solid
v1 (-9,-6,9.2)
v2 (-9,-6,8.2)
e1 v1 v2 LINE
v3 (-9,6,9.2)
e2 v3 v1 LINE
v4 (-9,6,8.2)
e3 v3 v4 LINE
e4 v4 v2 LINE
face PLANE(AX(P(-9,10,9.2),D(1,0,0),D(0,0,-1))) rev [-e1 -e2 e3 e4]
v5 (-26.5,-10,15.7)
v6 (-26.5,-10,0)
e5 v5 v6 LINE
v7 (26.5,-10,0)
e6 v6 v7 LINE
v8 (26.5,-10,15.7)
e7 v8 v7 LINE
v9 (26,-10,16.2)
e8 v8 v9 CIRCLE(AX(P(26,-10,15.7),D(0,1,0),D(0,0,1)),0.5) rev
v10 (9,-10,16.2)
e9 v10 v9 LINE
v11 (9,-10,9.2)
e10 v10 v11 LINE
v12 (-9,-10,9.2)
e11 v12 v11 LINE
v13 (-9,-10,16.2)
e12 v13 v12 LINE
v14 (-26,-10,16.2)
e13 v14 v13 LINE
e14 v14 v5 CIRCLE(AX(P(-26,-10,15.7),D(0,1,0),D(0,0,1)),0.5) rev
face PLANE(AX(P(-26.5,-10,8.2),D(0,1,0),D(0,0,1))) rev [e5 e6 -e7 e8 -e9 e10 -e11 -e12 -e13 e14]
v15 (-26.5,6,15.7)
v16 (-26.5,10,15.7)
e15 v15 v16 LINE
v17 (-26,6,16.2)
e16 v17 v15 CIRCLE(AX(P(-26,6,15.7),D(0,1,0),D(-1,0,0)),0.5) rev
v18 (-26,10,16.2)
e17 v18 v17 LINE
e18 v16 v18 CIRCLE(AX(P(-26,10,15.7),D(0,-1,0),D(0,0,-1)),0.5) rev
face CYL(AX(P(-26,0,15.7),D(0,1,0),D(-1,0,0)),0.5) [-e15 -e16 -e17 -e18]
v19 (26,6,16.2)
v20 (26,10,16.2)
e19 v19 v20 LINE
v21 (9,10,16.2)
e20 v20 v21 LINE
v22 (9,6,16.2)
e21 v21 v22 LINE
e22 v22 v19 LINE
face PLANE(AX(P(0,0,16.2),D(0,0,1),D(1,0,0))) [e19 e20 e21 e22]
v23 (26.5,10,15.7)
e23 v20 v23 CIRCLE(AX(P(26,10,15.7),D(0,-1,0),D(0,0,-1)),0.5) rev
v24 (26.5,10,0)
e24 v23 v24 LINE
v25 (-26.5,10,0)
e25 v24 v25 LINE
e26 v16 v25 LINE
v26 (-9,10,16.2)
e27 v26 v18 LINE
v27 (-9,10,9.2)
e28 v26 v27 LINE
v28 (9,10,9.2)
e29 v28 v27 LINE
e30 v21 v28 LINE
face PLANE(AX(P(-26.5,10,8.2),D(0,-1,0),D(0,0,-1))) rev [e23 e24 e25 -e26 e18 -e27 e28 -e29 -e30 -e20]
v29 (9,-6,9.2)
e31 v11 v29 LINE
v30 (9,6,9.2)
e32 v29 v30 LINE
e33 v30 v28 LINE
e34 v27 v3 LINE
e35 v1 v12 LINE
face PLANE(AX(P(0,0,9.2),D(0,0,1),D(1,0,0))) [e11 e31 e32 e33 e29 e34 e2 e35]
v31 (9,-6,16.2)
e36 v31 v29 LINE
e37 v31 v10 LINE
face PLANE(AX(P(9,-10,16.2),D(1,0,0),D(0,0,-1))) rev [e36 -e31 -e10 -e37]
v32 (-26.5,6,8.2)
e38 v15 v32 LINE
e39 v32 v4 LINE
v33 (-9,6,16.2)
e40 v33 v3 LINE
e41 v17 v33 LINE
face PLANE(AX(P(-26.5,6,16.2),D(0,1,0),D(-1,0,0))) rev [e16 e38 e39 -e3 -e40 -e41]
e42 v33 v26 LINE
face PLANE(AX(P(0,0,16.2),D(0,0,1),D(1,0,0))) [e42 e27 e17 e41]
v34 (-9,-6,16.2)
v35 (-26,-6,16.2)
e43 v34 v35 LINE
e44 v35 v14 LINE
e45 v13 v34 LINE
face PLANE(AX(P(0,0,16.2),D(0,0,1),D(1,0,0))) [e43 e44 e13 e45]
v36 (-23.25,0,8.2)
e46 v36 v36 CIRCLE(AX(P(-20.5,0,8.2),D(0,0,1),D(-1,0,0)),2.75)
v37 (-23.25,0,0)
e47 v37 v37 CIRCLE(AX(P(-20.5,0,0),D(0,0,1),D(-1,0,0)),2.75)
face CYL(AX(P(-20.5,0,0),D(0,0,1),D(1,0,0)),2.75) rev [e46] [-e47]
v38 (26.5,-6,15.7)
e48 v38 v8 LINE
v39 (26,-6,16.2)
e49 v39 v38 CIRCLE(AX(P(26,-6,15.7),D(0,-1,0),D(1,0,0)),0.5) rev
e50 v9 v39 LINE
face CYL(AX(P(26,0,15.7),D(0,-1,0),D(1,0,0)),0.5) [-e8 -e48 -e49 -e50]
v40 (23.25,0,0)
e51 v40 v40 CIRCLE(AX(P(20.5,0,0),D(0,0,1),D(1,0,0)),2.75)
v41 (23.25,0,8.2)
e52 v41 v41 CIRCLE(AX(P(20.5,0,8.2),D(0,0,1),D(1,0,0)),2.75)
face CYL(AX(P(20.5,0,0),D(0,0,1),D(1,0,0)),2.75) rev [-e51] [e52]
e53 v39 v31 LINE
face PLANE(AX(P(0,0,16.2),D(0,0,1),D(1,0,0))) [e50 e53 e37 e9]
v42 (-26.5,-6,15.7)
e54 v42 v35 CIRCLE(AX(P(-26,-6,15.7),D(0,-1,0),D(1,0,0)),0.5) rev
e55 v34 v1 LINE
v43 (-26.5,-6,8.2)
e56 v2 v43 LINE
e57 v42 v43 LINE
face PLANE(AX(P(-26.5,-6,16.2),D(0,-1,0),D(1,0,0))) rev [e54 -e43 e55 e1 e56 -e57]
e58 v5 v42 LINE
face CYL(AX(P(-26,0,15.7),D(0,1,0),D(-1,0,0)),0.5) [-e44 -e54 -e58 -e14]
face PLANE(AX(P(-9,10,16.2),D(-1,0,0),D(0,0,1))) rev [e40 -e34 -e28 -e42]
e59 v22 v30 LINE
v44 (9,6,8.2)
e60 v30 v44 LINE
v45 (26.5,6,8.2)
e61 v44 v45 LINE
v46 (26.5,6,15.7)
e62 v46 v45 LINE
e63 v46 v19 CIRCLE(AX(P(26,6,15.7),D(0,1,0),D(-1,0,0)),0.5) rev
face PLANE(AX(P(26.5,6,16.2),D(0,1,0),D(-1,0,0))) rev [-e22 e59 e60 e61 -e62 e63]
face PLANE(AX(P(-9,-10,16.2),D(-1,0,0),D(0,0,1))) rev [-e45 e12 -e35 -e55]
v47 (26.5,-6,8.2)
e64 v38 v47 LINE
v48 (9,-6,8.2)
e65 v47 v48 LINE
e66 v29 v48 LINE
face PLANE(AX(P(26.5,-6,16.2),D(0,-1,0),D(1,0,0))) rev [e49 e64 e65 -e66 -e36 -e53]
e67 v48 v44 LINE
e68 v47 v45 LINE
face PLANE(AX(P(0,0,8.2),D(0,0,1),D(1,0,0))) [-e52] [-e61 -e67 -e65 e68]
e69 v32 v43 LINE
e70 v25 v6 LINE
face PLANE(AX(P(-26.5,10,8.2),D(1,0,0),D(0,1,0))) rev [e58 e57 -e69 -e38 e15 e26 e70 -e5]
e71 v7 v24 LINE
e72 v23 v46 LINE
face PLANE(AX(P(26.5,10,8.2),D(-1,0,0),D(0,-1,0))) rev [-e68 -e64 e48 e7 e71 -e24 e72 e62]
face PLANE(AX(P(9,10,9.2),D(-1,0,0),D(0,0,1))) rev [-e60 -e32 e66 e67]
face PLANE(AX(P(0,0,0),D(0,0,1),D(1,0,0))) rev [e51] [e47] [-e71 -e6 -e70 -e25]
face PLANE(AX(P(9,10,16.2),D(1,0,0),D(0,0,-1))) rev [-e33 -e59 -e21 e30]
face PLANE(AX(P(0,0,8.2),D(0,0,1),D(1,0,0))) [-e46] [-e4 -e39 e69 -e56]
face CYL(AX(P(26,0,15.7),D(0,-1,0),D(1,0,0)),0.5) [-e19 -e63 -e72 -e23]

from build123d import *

# Parameters (mm, degrees)
EXTRUDE_1_OUTLINE_W = 53
EXTRUDE_1_OUTLINE_H = 20
EXTRUDE_1_DEPTH     = 8.2
SKETCH_2_W          = 18
SKETCH_2_H          = 20
EXTRUDE_2_DEPTH     = 1
SKETCH_3_R          = 2.75
CUT_EXTRUDE_1_DEPTH = 30.48711583
SKETCH_4_W          = 17.5
SKETCH_4_H          = 4
EXTRUDE_3_DEPTH     = 8
FILLET_1_R          = 0.5


# Read off the part's stored shape, not the designer's step: 보스-돌출1
with BuildPart() as part:
    # 보스-돌출1 outline → 보스-돌출1 (new body)
    with BuildSketch(Plane.XY):
        Rectangle(EXTRUDE_1_OUTLINE_W, EXTRUDE_1_OUTLINE_H)
    extrude(amount=EXTRUDE_1_DEPTH)

    # 스케치2 → 보스-돌출2 (add)
    with BuildSketch(Plane.XY.offset(8.2)):
        Rectangle(SKETCH_2_W, SKETCH_2_H)
    extrude(amount=EXTRUDE_2_DEPTH)

    # 스케치3 → 컷-돌출1 (cut, through all)
    with BuildSketch(Plane.XY.offset(8.2)):
        with Locations((20.5, 0)):
            Circle(SKETCH_3_R)
        with Locations(Location((-20.5, 0, 0), (0, 0, 180))):
            Circle(SKETCH_3_R)
    extrude(amount=-CUT_EXTRUDE_1_DEPTH, mode=Mode.SUBTRACT)

    # 스케치4 → 보스-돌출3 (add)
    with BuildSketch(Plane.XY.offset(8.2)):
        with Locations((17.75, -8)):
            Rectangle(SKETCH_4_W, SKETCH_4_H)
        with Locations((17.75, 8)):
            Rectangle(SKETCH_4_W, SKETCH_4_H)
        with Locations((-17.75, 8)):
            Rectangle(SKETCH_4_W, SKETCH_4_H)
        with Locations((-17.75, -8)):
            Rectangle(SKETCH_4_W, SKETCH_4_H)
    extrude(amount=EXTRUDE_3_DEPTH)

    # 필렛1
    fillet_1_edges = [part.edges().sort_by_distance(p)[0] for p in [
        (26.5, -8, 16.2),
        (26.5, 8, 16.2),
        (-26.5, 8, 16.2),
        (-26.5, -8, 16.2),
    ]]
    fillet(fillet_1_edges, radius=FILLET_1_R)


solid = part.part
